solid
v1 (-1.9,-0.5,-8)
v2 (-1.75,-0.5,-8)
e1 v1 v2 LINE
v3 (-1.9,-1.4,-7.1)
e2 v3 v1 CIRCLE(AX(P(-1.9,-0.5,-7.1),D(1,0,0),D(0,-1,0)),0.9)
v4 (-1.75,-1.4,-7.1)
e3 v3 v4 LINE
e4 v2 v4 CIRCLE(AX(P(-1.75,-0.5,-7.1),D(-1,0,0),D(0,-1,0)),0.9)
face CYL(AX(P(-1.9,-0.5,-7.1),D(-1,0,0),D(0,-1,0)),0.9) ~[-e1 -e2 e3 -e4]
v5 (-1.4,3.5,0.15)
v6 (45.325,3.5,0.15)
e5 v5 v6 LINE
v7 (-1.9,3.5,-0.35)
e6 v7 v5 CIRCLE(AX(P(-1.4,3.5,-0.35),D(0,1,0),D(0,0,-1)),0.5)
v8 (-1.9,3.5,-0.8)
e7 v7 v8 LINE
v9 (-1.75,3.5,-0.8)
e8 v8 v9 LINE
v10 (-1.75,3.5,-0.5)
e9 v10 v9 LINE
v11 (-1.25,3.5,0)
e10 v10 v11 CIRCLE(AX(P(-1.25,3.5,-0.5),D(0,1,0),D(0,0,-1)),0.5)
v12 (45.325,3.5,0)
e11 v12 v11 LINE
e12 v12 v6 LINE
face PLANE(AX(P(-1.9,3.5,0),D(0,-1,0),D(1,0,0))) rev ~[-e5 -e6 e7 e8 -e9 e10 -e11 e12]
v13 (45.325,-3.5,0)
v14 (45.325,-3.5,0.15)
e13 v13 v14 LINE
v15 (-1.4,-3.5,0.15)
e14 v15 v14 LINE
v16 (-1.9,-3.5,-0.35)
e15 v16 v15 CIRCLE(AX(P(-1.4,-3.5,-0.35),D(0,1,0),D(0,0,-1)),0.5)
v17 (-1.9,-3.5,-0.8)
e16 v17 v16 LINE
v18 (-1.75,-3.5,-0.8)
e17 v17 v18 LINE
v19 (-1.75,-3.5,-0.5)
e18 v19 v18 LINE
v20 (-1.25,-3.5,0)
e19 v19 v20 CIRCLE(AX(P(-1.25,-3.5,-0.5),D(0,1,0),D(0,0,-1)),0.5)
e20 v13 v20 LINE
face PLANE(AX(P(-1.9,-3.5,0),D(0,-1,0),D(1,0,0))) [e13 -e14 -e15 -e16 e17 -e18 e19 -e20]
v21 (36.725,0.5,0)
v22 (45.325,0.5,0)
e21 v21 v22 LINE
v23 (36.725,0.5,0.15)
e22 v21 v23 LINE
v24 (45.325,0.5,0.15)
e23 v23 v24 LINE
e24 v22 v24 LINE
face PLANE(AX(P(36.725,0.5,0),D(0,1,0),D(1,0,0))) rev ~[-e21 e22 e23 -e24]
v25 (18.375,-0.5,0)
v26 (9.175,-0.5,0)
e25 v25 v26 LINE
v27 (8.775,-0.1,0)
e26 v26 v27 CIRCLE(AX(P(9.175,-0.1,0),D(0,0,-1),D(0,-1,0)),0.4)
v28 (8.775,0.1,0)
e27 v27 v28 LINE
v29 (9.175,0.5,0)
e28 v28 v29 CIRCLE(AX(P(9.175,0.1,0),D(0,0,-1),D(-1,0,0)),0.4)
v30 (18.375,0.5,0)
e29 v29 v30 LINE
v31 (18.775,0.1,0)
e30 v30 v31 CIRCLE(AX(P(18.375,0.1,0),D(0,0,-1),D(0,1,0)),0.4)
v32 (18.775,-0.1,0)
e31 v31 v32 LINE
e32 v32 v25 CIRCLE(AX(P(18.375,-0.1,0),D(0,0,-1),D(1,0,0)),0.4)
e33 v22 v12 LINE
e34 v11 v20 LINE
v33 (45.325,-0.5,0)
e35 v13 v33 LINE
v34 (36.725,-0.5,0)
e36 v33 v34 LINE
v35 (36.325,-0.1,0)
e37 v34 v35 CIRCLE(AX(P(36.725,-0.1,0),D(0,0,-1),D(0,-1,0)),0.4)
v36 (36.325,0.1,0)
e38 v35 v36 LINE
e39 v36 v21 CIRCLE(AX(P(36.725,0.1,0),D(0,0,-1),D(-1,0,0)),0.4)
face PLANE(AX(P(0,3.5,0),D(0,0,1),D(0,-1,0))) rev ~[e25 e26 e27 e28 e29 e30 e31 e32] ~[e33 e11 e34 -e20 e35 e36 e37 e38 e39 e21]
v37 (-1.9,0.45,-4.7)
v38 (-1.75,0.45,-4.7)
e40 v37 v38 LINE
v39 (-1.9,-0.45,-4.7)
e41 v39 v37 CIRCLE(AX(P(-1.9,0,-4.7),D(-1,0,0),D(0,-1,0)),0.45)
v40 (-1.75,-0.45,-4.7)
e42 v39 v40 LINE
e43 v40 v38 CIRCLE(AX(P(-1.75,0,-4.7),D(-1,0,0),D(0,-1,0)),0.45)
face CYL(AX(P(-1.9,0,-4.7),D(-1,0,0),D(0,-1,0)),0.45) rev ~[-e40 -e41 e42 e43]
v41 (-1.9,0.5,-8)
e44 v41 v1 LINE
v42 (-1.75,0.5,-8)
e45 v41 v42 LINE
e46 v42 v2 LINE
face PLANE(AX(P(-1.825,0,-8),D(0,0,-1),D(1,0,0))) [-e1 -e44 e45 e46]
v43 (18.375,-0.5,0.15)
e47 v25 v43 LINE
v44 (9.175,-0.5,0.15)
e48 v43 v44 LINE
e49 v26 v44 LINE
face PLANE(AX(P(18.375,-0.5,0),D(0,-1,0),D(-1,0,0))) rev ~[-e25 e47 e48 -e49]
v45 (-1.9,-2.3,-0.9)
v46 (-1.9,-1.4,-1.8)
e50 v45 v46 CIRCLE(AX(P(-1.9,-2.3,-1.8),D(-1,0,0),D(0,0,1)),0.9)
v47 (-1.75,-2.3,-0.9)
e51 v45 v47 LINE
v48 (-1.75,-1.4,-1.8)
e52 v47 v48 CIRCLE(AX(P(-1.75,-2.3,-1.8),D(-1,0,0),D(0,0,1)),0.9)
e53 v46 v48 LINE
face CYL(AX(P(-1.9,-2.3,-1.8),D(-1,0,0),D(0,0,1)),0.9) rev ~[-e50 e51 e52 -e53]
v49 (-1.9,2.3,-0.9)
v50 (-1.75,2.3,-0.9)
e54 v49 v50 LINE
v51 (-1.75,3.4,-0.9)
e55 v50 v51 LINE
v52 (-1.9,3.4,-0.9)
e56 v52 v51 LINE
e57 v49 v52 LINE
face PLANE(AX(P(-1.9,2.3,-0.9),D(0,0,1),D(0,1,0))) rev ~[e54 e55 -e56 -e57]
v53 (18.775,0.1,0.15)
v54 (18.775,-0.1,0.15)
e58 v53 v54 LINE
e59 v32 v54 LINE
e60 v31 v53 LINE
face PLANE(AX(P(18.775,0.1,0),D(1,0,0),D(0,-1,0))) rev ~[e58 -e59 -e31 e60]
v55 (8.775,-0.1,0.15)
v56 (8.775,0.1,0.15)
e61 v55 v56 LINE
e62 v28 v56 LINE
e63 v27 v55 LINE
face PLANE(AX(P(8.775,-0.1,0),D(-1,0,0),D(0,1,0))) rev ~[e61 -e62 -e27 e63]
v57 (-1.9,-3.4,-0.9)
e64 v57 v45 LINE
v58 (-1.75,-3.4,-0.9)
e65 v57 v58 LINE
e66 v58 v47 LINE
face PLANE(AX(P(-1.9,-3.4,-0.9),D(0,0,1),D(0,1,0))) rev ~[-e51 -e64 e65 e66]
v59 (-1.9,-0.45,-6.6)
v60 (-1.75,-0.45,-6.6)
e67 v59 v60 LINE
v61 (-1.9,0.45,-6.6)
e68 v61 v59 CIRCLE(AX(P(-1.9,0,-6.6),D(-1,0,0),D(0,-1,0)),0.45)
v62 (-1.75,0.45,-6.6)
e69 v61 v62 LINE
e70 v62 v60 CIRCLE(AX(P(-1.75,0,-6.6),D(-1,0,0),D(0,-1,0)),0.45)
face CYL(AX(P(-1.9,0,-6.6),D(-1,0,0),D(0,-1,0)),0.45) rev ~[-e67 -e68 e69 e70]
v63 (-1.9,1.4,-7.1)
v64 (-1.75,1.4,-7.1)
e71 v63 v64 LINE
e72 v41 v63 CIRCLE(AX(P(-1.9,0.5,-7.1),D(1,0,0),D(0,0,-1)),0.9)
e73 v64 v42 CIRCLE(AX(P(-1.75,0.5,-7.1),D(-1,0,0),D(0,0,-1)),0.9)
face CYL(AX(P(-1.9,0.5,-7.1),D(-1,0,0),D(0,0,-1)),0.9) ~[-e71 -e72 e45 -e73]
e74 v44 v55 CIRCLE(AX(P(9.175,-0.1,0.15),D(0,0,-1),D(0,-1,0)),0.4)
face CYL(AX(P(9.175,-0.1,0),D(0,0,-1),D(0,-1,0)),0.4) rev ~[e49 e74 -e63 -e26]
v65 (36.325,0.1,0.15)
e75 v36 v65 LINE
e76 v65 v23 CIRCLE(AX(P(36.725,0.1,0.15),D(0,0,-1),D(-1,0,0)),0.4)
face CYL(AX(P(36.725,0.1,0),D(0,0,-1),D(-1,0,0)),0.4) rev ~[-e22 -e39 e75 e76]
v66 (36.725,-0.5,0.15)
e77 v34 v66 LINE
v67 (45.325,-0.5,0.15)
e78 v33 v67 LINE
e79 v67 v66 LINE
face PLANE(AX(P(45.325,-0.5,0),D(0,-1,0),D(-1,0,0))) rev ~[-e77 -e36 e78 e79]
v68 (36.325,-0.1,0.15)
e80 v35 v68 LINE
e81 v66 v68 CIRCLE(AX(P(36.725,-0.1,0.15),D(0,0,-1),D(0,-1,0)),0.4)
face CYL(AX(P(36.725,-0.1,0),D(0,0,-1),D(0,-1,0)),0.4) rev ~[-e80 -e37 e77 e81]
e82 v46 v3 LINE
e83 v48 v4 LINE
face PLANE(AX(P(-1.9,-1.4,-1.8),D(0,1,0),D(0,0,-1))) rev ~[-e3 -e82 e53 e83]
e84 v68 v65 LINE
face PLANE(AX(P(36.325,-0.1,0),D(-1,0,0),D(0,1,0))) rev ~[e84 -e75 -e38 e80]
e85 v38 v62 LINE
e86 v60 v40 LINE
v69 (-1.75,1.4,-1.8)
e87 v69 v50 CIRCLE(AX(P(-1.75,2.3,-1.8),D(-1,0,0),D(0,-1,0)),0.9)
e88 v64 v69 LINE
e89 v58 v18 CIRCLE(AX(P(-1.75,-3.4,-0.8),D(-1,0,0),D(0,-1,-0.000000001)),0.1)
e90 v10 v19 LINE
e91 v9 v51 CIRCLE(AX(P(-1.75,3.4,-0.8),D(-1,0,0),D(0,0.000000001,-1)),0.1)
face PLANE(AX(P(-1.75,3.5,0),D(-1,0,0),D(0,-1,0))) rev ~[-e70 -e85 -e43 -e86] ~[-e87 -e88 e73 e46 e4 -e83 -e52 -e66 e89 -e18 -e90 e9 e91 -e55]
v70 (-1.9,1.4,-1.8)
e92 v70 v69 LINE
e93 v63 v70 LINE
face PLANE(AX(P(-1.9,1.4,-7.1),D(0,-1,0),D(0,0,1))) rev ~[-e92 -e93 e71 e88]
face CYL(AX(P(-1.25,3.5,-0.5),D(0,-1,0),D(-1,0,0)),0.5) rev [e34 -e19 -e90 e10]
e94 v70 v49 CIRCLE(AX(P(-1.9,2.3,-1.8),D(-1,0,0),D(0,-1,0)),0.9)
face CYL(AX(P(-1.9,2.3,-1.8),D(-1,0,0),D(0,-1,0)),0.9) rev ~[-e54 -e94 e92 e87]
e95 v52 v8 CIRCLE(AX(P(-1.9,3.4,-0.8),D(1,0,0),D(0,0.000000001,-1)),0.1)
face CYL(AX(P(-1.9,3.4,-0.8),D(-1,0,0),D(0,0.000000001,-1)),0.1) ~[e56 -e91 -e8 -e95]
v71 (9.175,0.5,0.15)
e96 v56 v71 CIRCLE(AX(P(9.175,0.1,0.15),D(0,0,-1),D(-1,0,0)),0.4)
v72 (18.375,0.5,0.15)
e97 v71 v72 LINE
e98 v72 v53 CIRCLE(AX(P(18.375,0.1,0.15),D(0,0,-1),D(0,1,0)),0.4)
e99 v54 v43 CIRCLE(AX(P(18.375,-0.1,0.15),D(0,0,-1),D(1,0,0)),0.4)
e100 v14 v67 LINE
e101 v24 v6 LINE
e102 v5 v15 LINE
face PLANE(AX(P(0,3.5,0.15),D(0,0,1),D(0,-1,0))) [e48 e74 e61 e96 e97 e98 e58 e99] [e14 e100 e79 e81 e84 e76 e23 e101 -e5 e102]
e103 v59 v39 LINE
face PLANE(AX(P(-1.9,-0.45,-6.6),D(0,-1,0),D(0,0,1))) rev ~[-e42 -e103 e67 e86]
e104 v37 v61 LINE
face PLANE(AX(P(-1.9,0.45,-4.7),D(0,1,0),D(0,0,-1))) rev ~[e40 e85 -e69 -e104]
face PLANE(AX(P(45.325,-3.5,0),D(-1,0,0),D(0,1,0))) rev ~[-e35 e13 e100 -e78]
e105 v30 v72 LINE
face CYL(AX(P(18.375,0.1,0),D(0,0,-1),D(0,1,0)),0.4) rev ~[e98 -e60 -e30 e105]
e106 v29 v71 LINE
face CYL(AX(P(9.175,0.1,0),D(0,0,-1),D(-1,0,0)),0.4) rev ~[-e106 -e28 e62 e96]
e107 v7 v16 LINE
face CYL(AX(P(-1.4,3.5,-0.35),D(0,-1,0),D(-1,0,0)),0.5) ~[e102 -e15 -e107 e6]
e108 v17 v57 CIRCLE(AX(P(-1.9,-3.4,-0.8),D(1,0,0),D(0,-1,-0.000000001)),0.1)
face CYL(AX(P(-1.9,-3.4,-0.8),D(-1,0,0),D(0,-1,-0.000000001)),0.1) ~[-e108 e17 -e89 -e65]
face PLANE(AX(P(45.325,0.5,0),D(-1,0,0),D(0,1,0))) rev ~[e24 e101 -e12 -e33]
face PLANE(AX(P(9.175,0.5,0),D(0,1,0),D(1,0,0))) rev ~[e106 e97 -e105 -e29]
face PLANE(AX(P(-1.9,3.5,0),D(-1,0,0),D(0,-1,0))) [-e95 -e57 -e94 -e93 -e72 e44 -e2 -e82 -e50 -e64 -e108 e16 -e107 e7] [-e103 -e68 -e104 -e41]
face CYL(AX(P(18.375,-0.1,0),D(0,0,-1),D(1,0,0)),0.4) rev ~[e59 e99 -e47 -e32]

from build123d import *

# Parameters (mm, degrees)
F0_W     = 4
F0_H     = 3
F1_DEPTH = 0.15
F2_DEPTH = 1.9
F3_W     = 0.15
F3_H     = 7
F4_DEPTH = 8
F6_DEPTH = 25
F7_R     = 0.5


# Not quite as in the source:
# - a feature names something its author has since deleted; it is built from what else it names


with BuildPart() as f1:
    # F0 (on Top) → F1 (new body)
    with BuildSketch(Plane.XY):
        with BuildLine():
            Line((13.775, -0.5), (13.775, -3.5))
            Line((13.775, -3.5), (27.55, -3.5))
            Line((27.55, -3.5), (41.325, -3.5))
            Line((41.325, -3.5), (41.325, -0.5))
            Line((41.325, -0.5), (36.725, -0.5))
            ThreePointArc((36.725, -0.5), (36.4421572875, -0.3828427125), (36.325, -0.1))
            Line((36.325, -0.1), (36.325, 0.1))
            ThreePointArc((36.325, 0.1), (36.4421572875, 0.3828427125), (36.725, 0.5))
            Line((36.725, 0.5), (41.325, 0.5))
            Line((41.325, 0.5), (41.325, 3.5))
            Line((41.325, 3.5), (27.55, 3.5))
            Line((27.55, 3.5), (13.775, 3.5))
            Line((13.775, 3.5), (13.775, 0.5))
            Line((13.775, 0.5), (18.375, 0.5))
            ThreePointArc((18.375, 0.5), (18.6578427125, 0.3828427125), (18.775, 0.1))
            Line((18.775, 0.1), (18.775, -0.1))
            ThreePointArc((18.775, -0.1), (18.6578427125, -0.3828427125), (18.375, -0.5))
            Line((18.375, -0.5), (13.775, -0.5))
        make_face()
        with Locations((43.325, 2)):
            Rectangle(F0_W, F0_H)
        with BuildLine():
            Line((0, 3.5), (0, -3.5))
            Line((0, -3.5), (13.775, -3.5))
            Line((13.775, -3.5), (13.775, -0.5))
            Line((13.775, -0.5), (9.175, -0.5))
            ThreePointArc((9.175, -0.5), (8.8921572875, -0.3828427125), (8.775, -0.1))
            Line((8.775, -0.1), (8.775, 0.1))
            ThreePointArc((8.775, 0.1), (8.8921572875, 0.3828427125), (9.175, 0.5))
            Line((9.175, 0.5), (13.775, 0.5))
            Line((13.775, 0.5), (13.775, 3.5))
            Line((13.775, 3.5), (0, 3.5))
        make_face()
        with Locations((43.325, -2)):
            Rectangle(F0_W, F0_H)
    extrude(amount=F1_DEPTH)

    # F2 (add): a face of the model
    f2_faces = [f1.faces().sort_by_distance(p)[0] for p in [
        (0, 0, 0.075),
    ]]
    extrude(f2_faces, amount=F2_DEPTH)

    # F3 (on face) → F4 (join)
    with BuildSketch(Plane(origin=(0, 0, 0), x_dir=(1, 0, 0), z_dir=(0, 0, -1))):
        with Locations((-1.825, 0)):
            Rectangle(F3_W, F3_H)
    extrude(amount=F4_DEPTH)

    # F5 (on face) → F6 (cut)
    with BuildSketch(Plane(origin=(-1.9, 0, 0), x_dir=(0, -1, 0), z_dir=(-1, 0, 0))):
        with BuildLine():
            Line((-3.5, -8), (-0.5, -8))
            ThreePointArc((-0.5, -8), (-1.1363961031, -7.7363961031), (-1.4, -7.1))
            Line((-1.4, -7.1), (-1.4, -1.8))
            ThreePointArc((-1.4, -1.8), (-1.6636038969, -1.1636038969), (-2.3, -0.9))
            Line((-2.3, -0.9), (-3.4, -0.9))
            ThreePointArc((-3.4, -0.9), (-3.4707106781, -0.8707106781), (-3.5, -0.8))
            Line((-3.5, -0.8), (-3.5, -8))
        make_face()
        with BuildLine():
            ThreePointArc((1.4, -7.1), (1.1363961031, -7.7363961031), (0.5, -8))
            Line((0.5, -8), (3.5, -8))
            Line((3.5, -8), (3.5, -0.8))
            ThreePointArc((3.5, -0.8), (3.4707106781, -0.8707106781), (3.4, -0.9))
            Line((3.4, -0.9), (2.3, -0.9))
            ThreePointArc((2.3, -0.9), (1.6636038969, -1.1636038969), (1.4, -1.8))
            Line((1.4, -1.8), (1.4, -7.1))
        make_face()
        with BuildLine():
            ThreePointArc((-0.45, -6.6), (0, -7.05), (0.45, -6.6))
            ThreePointArc((0.45, -6.6), (0, -6.15), (-0.45, -6.6))
        make_face()
        with BuildLine():
            ThreePointArc((-0.45, -6.6), (0, -6.15), (0.45, -6.6))
            Line((0.45, -6.6), (0.45, -4.7))
            ThreePointArc((0.45, -4.7), (0, -5.15), (-0.45, -4.7))
            Line((-0.45, -4.7), (-0.45, -6.6))
        make_face()
        with BuildLine():
            ThreePointArc((-0.45, -4.7), (0, -5.15), (0.45, -4.7))
            ThreePointArc((0.45, -4.7), (0, -4.25), (-0.45, -4.7))
        make_face()
    extrude(amount=-F6_DEPTH, mode=Mode.SUBTRACT)

    # F7
    f7_edges = [f1.edges().sort_by_distance(p)[0] for p in [
        (-1.9, 0, 0.15),
        (-1.75, 0, 0),
    ]]
    fillet(f7_edges, radius=F7_R)


solid = f1.part
